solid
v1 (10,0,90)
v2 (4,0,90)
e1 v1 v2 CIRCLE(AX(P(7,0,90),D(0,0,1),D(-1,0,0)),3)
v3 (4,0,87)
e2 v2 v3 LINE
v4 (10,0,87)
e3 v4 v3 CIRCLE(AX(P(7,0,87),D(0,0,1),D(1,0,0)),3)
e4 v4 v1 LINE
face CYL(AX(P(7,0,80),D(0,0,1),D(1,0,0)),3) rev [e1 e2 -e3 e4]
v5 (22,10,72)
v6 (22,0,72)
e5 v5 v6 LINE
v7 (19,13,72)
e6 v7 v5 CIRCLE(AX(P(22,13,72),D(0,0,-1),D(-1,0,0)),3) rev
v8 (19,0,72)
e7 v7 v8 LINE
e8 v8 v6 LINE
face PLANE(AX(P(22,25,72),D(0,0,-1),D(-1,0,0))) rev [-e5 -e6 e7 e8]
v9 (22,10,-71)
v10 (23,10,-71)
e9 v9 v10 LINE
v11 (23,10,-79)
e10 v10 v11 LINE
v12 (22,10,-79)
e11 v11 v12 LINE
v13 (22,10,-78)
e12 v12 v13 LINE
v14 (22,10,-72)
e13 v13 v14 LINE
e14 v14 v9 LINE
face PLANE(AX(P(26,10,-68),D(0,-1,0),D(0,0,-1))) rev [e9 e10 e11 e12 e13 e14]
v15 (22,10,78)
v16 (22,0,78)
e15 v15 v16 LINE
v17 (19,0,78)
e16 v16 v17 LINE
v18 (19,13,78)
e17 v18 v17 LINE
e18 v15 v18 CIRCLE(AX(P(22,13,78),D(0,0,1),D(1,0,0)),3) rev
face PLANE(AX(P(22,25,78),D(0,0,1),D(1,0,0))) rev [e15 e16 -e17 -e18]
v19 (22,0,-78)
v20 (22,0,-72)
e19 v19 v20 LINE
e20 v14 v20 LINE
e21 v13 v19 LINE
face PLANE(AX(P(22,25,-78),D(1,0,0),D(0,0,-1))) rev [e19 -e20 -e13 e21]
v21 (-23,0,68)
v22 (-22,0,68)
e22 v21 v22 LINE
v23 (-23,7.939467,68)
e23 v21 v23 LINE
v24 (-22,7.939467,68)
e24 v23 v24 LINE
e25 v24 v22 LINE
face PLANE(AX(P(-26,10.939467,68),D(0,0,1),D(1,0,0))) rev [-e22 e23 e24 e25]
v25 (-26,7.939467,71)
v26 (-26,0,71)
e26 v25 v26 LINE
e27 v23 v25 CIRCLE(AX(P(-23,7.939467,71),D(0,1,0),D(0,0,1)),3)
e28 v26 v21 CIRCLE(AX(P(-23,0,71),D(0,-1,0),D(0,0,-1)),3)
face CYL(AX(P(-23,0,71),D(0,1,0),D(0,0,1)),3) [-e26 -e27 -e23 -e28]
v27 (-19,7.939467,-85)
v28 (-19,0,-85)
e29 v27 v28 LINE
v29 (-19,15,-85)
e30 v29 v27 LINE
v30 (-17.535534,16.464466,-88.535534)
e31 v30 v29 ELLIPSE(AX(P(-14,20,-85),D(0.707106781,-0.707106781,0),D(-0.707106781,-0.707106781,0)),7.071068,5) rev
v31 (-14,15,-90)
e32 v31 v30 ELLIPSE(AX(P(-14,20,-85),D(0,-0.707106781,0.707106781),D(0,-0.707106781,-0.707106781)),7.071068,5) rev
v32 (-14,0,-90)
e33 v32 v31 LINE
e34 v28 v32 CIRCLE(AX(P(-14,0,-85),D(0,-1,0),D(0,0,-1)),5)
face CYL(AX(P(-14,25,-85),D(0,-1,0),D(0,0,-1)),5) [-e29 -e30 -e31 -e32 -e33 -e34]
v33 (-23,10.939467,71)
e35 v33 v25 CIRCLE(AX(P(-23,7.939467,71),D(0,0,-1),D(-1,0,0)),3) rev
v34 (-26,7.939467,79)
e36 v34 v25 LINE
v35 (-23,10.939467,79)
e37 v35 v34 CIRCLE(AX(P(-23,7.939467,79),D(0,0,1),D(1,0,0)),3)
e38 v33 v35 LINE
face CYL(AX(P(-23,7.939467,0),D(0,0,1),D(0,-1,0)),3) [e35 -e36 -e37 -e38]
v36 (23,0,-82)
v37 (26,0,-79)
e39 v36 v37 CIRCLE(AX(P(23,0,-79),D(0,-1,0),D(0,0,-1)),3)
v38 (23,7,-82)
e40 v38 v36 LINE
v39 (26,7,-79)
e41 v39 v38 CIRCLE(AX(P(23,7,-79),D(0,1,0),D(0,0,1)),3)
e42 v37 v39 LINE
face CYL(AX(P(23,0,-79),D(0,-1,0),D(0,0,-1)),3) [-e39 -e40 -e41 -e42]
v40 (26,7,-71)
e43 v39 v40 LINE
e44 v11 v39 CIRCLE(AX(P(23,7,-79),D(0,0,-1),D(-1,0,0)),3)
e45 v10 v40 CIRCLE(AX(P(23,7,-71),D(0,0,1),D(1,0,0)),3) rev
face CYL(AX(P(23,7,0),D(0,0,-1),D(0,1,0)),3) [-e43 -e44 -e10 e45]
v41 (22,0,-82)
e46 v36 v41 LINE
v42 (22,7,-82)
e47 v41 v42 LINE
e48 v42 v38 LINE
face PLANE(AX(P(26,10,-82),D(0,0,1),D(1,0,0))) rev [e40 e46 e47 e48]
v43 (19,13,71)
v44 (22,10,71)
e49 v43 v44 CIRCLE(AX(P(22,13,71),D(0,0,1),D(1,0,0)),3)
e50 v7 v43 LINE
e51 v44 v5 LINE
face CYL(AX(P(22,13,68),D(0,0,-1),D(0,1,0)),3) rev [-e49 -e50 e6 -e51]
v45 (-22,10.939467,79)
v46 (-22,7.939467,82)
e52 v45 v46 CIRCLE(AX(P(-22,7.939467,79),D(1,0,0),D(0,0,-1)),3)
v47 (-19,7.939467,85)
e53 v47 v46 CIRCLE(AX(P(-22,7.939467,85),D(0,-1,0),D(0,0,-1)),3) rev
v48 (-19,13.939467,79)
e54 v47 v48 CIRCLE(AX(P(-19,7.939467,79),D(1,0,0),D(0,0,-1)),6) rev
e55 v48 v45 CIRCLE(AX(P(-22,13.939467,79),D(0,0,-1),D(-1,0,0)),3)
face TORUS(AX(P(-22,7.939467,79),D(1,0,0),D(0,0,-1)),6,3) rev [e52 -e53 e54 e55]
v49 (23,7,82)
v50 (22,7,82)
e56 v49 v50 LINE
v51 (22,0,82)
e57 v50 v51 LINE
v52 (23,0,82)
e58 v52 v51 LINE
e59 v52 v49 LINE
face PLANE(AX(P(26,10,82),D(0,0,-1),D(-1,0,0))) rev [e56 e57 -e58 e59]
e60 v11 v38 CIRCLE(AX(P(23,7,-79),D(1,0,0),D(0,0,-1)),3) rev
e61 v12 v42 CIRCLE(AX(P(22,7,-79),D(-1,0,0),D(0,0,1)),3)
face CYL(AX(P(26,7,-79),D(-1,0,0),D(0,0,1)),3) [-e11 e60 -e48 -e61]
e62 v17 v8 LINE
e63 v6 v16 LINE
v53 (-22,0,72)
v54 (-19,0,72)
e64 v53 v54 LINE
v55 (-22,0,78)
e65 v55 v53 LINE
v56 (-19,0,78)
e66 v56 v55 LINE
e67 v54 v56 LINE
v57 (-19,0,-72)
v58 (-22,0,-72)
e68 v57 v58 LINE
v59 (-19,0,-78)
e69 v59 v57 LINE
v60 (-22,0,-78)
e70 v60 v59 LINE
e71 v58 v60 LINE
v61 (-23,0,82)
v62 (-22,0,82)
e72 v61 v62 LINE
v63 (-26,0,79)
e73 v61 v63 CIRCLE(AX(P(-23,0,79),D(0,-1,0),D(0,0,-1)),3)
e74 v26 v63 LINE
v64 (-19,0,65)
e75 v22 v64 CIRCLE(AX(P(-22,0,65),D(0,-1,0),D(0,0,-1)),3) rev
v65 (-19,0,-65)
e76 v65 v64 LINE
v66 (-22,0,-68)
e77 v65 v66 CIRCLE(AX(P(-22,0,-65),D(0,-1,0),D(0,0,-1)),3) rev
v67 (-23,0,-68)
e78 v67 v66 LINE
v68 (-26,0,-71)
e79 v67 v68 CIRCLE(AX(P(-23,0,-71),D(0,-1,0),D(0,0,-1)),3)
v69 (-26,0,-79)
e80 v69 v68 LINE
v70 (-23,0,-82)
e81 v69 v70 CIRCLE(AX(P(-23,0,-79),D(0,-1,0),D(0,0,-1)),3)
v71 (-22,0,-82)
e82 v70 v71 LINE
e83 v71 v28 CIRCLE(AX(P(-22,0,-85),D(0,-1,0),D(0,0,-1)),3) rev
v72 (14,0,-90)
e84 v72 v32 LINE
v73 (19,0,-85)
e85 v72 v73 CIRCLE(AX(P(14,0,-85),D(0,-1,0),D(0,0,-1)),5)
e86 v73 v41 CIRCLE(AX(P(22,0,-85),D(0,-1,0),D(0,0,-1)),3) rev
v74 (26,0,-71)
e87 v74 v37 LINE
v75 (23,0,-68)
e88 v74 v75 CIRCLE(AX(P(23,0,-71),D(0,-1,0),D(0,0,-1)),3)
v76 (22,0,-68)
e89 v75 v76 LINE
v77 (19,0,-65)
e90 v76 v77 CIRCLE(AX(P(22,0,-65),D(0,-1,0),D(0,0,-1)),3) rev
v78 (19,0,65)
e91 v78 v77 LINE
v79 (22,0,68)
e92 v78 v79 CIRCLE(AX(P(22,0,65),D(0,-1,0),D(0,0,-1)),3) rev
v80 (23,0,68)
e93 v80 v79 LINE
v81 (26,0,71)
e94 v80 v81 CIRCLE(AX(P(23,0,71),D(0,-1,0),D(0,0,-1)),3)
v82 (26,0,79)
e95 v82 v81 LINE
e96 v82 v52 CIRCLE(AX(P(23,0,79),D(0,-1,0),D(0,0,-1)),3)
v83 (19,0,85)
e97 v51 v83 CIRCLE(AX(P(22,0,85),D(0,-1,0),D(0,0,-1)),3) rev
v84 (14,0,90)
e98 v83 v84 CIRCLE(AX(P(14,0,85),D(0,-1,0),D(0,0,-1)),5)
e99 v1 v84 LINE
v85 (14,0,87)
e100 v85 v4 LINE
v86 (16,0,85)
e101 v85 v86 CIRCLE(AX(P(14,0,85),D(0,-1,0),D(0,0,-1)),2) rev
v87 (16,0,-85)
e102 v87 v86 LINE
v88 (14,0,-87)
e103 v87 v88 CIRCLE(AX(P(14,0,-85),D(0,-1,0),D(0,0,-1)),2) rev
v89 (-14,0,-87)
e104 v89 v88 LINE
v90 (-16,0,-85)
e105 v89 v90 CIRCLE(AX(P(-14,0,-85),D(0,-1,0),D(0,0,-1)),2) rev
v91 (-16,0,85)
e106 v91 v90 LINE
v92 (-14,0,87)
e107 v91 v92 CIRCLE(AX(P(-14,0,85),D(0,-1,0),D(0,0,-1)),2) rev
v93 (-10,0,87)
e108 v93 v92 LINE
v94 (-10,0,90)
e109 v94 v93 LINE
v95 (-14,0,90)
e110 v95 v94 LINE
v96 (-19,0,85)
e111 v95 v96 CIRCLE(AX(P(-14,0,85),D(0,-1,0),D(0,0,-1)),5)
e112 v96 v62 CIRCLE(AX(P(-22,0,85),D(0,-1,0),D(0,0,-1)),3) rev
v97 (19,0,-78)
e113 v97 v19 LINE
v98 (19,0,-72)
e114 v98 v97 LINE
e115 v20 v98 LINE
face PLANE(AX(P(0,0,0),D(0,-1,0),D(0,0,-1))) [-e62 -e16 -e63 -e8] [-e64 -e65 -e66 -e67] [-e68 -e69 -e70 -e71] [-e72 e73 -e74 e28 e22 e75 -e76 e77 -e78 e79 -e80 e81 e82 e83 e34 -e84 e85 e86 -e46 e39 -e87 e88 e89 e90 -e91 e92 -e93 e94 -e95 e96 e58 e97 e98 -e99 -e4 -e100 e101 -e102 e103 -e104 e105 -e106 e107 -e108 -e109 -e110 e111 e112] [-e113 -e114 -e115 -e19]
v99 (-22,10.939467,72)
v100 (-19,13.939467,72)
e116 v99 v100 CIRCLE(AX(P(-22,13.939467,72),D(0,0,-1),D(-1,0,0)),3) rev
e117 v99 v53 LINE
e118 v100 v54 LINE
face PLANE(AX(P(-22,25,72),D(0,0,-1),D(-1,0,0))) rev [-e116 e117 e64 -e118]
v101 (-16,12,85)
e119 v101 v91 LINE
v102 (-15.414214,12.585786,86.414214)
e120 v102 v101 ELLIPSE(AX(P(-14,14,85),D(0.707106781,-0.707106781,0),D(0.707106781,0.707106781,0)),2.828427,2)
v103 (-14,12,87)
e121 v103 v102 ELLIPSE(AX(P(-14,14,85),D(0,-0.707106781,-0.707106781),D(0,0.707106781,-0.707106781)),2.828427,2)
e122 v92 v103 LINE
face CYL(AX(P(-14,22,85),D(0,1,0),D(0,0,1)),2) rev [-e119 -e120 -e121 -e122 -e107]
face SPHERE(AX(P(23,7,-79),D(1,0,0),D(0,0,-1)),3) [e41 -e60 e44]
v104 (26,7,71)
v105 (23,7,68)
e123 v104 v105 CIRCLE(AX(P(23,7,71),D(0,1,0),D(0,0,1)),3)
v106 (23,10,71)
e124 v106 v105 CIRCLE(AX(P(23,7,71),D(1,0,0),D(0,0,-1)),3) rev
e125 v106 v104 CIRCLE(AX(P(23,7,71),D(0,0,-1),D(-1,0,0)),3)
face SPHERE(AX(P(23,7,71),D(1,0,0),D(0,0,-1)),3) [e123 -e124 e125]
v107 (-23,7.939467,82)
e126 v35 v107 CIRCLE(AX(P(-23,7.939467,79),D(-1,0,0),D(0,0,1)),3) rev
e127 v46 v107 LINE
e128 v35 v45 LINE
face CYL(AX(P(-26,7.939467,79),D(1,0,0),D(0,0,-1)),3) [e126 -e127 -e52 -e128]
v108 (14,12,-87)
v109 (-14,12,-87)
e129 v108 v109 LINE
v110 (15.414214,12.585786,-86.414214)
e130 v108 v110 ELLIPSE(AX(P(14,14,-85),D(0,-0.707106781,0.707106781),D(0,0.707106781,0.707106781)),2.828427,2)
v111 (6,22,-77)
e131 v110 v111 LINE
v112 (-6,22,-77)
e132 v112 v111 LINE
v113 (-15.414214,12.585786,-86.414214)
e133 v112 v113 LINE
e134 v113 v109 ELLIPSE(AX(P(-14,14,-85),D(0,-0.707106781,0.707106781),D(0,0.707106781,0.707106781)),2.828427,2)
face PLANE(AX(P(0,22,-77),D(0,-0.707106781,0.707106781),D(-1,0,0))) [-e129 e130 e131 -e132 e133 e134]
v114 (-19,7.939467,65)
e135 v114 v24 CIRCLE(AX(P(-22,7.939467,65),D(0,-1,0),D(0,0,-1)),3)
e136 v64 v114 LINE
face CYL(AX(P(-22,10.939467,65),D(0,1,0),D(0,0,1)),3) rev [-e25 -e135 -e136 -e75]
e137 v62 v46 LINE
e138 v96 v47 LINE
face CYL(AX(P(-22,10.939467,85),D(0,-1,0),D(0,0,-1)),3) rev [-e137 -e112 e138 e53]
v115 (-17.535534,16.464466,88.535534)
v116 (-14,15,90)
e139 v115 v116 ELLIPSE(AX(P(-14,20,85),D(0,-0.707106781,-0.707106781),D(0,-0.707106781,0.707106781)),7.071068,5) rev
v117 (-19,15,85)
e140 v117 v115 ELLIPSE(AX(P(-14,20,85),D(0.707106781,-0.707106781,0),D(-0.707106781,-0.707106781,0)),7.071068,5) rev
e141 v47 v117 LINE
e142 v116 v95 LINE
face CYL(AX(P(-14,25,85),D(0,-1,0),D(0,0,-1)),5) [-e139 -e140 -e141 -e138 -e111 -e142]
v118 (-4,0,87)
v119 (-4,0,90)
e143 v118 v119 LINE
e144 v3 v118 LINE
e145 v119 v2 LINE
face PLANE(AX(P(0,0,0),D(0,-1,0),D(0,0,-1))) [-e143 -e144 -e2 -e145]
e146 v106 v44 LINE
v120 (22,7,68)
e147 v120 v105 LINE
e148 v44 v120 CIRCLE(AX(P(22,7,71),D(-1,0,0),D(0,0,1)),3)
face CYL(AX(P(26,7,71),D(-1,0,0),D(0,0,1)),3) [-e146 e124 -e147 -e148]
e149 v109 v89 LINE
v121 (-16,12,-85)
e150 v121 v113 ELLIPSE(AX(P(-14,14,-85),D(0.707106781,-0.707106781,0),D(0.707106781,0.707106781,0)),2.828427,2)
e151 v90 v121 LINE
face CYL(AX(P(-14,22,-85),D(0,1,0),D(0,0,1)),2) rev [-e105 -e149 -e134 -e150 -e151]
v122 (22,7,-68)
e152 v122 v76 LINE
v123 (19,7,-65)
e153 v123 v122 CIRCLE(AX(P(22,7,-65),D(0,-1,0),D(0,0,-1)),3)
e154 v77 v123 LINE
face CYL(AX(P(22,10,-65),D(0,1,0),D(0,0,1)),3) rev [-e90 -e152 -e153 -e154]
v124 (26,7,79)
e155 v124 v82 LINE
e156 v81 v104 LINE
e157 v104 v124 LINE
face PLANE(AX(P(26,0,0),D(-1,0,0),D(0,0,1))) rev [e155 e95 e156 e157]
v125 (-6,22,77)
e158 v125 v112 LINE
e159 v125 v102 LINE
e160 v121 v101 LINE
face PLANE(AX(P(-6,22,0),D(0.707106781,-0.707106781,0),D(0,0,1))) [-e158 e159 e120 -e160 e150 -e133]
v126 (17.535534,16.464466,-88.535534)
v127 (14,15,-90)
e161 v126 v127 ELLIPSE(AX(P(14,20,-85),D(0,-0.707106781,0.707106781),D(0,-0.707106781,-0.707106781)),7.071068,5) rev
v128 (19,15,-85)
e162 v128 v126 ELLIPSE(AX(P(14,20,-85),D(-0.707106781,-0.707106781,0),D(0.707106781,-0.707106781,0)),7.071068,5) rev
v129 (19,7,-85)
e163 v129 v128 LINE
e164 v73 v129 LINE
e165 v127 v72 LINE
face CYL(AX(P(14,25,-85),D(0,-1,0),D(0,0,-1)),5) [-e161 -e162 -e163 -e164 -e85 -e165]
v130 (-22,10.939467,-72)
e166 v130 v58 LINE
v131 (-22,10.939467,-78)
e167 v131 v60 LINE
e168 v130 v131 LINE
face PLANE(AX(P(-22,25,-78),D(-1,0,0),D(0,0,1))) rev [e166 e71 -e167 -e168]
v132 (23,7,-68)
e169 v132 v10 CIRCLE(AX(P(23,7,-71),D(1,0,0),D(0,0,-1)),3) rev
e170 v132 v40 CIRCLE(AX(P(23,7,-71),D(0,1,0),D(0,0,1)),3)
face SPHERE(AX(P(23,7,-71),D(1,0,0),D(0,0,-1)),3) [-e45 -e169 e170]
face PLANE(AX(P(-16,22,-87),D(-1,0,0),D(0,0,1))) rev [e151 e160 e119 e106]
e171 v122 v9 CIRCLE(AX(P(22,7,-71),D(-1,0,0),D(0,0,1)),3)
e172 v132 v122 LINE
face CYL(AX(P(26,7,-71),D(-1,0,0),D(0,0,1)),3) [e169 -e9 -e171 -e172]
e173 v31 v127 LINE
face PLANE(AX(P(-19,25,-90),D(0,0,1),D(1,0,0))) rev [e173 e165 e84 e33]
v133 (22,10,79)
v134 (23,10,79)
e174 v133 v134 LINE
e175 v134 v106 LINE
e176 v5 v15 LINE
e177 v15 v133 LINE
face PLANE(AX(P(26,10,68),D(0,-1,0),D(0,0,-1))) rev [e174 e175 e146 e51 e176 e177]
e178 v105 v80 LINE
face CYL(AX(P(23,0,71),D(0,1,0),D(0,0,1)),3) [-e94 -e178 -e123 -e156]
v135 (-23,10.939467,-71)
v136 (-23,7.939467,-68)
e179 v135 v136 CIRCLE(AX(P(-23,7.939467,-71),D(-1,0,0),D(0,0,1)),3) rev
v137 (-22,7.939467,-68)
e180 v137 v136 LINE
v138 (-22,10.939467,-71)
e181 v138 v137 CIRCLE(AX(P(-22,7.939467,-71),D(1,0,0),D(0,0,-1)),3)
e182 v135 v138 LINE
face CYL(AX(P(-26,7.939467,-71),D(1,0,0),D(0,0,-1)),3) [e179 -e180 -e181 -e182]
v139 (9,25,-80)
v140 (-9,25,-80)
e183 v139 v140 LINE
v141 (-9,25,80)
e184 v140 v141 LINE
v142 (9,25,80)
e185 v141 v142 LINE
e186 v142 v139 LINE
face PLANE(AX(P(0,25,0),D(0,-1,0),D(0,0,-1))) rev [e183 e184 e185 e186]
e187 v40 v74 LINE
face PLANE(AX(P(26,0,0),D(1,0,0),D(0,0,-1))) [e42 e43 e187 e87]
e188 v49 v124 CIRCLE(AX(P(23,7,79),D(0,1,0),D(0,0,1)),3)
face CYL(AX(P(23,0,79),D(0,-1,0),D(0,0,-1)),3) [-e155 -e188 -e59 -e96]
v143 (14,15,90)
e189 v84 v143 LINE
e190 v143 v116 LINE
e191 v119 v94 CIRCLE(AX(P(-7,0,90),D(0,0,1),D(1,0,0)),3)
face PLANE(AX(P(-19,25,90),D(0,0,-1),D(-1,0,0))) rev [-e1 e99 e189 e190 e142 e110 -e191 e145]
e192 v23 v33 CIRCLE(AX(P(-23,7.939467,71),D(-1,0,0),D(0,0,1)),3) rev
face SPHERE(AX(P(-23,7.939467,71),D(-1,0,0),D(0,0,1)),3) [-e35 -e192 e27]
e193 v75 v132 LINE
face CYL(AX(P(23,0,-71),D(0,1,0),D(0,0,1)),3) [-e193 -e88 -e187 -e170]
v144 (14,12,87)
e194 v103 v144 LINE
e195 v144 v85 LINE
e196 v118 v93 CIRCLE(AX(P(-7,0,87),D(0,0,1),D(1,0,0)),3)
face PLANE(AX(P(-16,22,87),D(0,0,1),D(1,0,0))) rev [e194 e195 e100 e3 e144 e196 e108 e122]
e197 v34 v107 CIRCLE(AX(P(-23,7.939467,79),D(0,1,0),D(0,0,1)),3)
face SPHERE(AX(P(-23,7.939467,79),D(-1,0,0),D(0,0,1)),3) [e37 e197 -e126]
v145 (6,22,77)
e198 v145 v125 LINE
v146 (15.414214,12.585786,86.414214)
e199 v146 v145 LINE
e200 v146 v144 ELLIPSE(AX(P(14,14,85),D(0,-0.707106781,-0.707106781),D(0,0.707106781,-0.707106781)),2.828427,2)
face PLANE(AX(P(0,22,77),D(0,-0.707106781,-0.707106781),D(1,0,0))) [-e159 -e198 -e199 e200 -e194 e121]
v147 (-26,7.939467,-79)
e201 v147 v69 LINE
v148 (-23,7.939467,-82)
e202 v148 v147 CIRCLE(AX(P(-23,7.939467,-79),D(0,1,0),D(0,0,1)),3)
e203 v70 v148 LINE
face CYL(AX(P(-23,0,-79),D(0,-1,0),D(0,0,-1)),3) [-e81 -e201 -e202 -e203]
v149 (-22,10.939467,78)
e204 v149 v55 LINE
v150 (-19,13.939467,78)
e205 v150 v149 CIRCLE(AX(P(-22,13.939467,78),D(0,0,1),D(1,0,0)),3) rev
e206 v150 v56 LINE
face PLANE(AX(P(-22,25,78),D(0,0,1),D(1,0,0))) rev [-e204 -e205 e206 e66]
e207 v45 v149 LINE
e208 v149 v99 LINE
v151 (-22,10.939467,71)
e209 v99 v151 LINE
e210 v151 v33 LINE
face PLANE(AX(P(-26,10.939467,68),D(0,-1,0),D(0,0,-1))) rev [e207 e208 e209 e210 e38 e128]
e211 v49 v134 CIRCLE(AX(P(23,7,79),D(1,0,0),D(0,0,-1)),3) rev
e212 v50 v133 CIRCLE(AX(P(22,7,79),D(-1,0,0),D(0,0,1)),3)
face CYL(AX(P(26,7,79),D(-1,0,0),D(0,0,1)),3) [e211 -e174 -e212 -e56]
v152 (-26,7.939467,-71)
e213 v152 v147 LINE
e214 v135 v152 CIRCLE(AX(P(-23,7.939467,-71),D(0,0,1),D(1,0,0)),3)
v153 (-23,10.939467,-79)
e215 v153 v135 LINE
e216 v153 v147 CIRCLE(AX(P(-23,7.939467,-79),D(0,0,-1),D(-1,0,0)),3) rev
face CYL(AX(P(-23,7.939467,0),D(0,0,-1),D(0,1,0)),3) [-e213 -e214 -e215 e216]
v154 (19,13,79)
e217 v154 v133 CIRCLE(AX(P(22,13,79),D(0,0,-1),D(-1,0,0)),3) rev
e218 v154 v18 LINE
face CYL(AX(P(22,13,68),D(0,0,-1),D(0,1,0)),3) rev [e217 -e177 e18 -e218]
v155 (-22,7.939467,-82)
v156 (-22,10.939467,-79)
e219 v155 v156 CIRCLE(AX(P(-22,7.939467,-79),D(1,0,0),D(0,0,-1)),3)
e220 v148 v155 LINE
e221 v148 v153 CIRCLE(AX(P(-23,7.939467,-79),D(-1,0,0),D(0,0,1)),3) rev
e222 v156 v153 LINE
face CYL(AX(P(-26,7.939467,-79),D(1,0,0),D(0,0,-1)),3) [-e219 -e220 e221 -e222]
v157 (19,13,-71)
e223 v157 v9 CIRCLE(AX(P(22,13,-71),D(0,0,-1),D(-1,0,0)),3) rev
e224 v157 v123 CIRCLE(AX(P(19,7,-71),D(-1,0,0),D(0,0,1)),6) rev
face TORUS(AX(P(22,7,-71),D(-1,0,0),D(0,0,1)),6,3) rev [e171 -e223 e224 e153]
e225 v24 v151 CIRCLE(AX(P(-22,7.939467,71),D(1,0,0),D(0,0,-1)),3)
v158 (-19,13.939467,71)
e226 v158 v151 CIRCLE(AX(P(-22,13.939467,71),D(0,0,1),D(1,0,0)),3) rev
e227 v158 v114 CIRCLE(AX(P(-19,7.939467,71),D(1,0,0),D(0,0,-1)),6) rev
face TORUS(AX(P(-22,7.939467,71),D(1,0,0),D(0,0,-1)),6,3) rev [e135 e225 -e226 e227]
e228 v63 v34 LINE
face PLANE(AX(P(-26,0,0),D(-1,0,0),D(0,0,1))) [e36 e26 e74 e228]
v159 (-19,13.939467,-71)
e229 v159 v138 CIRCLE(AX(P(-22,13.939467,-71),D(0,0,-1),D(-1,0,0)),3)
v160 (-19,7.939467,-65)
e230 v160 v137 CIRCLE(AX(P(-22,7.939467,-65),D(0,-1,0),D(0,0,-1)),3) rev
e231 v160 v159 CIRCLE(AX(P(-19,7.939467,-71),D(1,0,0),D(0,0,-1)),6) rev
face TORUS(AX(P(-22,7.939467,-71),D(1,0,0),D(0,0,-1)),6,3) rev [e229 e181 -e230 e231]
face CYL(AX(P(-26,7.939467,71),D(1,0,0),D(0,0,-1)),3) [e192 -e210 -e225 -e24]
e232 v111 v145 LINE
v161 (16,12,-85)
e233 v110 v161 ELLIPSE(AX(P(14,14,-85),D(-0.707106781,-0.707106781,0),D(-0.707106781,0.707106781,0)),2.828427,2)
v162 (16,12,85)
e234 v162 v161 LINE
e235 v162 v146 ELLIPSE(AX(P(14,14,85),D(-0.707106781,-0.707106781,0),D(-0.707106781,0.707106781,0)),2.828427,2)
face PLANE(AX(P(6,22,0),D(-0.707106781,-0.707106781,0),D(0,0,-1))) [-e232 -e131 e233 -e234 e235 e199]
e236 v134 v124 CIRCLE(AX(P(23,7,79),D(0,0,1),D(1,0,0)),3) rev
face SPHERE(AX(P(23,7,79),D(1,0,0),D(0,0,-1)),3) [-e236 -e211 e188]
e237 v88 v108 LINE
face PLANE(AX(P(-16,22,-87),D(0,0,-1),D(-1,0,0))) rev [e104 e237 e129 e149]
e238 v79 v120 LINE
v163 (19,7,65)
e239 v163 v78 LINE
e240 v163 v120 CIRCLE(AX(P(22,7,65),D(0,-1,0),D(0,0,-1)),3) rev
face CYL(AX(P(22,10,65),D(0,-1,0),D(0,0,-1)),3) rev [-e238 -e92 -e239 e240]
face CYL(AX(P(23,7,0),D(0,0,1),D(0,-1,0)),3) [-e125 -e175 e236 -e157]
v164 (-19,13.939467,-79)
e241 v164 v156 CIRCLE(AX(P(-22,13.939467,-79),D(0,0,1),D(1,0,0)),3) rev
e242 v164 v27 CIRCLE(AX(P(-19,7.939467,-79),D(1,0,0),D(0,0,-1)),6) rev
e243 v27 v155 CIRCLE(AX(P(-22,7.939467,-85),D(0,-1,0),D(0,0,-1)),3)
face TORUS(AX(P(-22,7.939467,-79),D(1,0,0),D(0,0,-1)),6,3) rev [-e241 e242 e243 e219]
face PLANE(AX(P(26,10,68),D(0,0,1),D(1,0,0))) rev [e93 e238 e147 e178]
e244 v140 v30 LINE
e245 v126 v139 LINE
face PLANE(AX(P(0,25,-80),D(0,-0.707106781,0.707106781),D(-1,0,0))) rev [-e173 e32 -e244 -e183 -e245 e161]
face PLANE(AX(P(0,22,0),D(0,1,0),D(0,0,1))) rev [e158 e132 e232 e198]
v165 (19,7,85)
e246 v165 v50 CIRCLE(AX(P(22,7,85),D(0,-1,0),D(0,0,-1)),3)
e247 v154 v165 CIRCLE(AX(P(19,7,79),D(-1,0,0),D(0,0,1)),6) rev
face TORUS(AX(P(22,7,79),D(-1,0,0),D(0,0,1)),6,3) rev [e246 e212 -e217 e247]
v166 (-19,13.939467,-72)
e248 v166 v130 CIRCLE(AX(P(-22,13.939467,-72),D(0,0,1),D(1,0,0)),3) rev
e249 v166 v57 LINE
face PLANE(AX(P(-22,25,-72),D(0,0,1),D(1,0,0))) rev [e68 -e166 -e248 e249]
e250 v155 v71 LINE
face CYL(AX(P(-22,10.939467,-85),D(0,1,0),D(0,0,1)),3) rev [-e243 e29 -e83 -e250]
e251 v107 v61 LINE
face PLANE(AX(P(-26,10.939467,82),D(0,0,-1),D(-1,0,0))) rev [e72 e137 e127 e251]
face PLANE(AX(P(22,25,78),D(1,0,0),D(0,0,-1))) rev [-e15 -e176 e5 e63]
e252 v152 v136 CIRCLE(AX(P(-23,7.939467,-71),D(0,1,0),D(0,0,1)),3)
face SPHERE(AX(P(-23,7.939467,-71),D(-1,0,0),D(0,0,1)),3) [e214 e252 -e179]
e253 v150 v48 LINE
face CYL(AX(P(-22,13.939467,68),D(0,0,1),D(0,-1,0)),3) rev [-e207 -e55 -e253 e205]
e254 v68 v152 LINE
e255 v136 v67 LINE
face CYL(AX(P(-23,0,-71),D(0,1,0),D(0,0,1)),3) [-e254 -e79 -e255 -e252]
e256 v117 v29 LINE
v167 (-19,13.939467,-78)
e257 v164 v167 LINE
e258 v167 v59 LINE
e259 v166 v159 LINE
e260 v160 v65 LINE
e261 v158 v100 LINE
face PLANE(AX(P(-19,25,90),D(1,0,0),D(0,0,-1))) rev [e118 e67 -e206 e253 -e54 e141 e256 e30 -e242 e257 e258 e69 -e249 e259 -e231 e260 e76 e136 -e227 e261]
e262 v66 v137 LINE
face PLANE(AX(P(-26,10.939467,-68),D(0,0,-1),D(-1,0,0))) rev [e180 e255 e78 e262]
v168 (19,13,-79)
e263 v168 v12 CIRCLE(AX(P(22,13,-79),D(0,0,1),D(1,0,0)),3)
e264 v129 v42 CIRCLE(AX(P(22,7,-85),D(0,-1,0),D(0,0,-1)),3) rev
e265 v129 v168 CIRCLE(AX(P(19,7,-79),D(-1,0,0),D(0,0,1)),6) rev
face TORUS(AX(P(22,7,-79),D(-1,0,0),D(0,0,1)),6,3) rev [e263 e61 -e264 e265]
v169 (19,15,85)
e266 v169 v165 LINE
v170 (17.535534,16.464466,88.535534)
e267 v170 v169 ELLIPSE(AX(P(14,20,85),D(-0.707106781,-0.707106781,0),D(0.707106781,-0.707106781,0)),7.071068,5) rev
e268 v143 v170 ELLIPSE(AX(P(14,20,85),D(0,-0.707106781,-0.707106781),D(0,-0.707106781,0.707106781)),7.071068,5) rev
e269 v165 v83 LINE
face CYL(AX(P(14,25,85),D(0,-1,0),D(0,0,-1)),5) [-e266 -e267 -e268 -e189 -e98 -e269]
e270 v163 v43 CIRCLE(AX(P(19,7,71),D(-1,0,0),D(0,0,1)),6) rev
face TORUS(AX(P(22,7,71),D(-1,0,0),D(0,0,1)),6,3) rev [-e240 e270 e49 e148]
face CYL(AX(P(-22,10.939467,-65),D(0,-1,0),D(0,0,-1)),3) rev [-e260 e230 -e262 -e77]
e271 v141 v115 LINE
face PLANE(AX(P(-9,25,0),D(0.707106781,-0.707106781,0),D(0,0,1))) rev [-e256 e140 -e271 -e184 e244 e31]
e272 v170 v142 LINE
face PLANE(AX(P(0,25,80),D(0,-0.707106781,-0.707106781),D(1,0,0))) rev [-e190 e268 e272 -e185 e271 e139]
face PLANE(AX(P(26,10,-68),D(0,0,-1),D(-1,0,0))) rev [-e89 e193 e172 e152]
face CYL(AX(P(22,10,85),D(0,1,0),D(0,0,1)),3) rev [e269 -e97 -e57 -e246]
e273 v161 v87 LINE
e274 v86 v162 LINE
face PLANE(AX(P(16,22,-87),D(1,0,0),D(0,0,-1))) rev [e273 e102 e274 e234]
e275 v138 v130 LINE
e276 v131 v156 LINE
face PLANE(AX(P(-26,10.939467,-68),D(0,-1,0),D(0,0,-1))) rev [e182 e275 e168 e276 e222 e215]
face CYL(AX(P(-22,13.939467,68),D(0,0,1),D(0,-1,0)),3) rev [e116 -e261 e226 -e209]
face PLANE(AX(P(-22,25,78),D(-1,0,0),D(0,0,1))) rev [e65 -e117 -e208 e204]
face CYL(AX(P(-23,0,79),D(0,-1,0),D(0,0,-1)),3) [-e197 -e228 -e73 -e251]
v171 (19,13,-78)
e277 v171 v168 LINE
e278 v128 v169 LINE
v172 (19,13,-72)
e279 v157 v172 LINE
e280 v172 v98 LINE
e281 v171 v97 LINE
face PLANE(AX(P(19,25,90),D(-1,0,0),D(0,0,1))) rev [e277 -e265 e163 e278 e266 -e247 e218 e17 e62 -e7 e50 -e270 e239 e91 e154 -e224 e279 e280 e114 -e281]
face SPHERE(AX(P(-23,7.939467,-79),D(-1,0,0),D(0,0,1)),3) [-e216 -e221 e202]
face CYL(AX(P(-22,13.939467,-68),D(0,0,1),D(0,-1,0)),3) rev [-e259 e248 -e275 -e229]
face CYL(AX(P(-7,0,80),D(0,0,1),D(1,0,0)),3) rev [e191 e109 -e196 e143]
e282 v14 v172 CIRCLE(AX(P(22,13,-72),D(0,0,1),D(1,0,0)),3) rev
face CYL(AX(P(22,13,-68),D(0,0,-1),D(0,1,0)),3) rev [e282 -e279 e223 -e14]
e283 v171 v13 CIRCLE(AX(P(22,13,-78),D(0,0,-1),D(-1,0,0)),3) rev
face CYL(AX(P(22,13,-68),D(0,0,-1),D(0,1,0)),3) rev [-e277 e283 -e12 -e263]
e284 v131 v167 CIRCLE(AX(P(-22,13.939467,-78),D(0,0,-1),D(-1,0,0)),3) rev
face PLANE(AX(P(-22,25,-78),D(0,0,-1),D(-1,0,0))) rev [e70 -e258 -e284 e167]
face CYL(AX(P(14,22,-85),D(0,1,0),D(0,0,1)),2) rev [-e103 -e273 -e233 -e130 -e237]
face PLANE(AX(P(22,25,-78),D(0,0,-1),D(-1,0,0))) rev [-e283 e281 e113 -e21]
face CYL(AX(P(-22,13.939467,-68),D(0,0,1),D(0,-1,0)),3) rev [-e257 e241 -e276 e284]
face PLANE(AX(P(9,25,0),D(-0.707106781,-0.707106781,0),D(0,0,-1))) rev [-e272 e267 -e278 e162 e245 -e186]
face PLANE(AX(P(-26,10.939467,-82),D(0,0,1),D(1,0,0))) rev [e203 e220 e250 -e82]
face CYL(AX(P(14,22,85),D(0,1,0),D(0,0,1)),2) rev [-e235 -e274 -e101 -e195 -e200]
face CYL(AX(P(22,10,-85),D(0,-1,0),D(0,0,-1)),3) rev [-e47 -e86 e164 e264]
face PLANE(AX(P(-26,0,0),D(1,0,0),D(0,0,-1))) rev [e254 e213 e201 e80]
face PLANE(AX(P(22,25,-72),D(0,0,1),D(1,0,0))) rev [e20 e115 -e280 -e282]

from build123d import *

# Parameters (mm, degrees)
SKETCH1_W           = 38
SKETCH1_H           = 180
BOSS_EXTRUDE1_DEPTH = 25
SKETCH2_W           = 32
SKETCH2_H           = 174
CUT_EXTRUDE1_DEPTH  = 22
CHAMFER1_SIZE       = 10
FILLET1_R           = 5
FILLET2_R           = 2
SKETCH3_W           = 14
SKETCH3_H           = 10
BOSS_EXTRUDE2_DEPTH = 7
SKETCH4_W           = 14
SKETCH4_H           = 10.939467079
BOSS_EXTRUDE3_DEPTH = 7
FILLET3_R           = 3
SKETCH5_W           = 3
SKETCH5_H           = 6
CUT_EXTRUDE2_DEPTH  = 97.958754117
SKETCH6_R           = 3
CUT_EXTRUDE3_DEPTH  = 10


with BuildPart() as part:
    # Sketch1 → Boss-Extrude1 (new body)
    with BuildSketch(Plane(origin=(0, 0, 0), x_dir=(1, 0, 0), z_dir=(0, 1, 0))):
        Rectangle(SKETCH1_W, SKETCH1_H)
    extrude(amount=BOSS_EXTRUDE1_DEPTH)

    # Sketch2 → Cut-Extrude1 (cut)
    with BuildSketch(Plane.XZ):
        Rectangle(SKETCH2_W, SKETCH2_H)
    extrude(amount=-CUT_EXTRUDE1_DEPTH, mode=Mode.SUBTRACT)

    # Chamfer1
    chamfer1_edges = [part.edges().sort_by_distance(p)[0] for p in [
        (-19, 25, 0),
        (16, 22, 0),
        (0, 25, 90),
        (0, 22, -87),
        (-16, 22, 0),
        (0, 22, 87),
        (19, 25, 0),
        (0, 25, -90),
    ]]
    chamfer(chamfer1_edges, length=CHAMFER1_SIZE)

    # Fillet1
    fillet1_edges = [part.edges().sort_by_distance(p)[0] for p in [
        (19, 7.5, 90),
        (-19, 7.5, 90),
        (-19, 7.5, -90),
        (19, 7.5, -90),
    ]]
    fillet(fillet1_edges, radius=FILLET1_R)

    # Fillet2
    fillet2_edges = [part.edges().sort_by_distance(p)[0] for p in [
        (16, 6, -87),
        (-16, 6, -87),
        (-16, 6, 87),
        (16, 6, 87),
    ]]
    fillet(fillet2_edges, radius=FILLET2_R)

    # Sketch3 → Boss-Extrude2 (add)
    with BuildSketch(Plane(origin=(19, 0, 0), x_dir=(0, 0, -1), z_dir=(1, 0, 0))):
        with Locations((-75, 5)):
            Rectangle(SKETCH3_W, SKETCH3_H)
        with Locations((75, 5)):
            Rectangle(SKETCH3_W, SKETCH3_H)
    extrude(amount=BOSS_EXTRUDE2_DEPTH)

    # Sketch4 → Boss-Extrude3 (add)
    with BuildSketch(Plane.ZY.offset(19)):
        with Locations((-75, 5.469733539)):
            Rectangle(SKETCH4_W, SKETCH4_H)
        with Locations((75, 5.469733539)):
            Rectangle(SKETCH4_W, SKETCH4_H)
    extrude(amount=BOSS_EXTRUDE3_DEPTH)

    # Fillet3
    fillet3_edges = [part.edges().sort_by_distance(p)[0] for p in [
        (19, 5, 82),
        (22.5, 10, 82),
        (19, 5, 68),
        (19, 10, 75),
        (22.5, 10, 68),
        (26, 5, 82),
        (26, 5, 68),
        (26, 10, 75),
        (19, 5, -68),
        (22.5, 10, -68),
        (19, 5, -82),
        (19, 10, -75),
        (22.5, 10, -82),
        (26, 5, -68),
        (26, 5, -82),
        (26, 10, -75),
        (-19, 5.46973354, -82),
        (-22.5, 10.939467079, -82),
        (-19, 5.46973354, -68),
        (-19, 10.939467079, -75),
        (-22.5, 10.939467079, -68),
        (-26, 5.46973354, -82),
        (-26, 5.46973354, -68),
        (-26, 10.939467079, -75),
        (-19, 5.46973354, 68),
        (-22.5, 10.939467079, 68),
        (-19, 5.46973354, 82),
        (-19, 10.939467079, 75),
        (-22.5, 10.939467079, 82),
        (-26, 5.46973354, 68),
        (-26, 5.46973354, 82),
        (-26, 10.939467079, 75),
    ]]
    fillet(fillet3_edges, radius=FILLET3_R - 0.0001)  # a hair under: the kernel refuses the full size

    # Sketch5 → Cut-Extrude2 (cut, through all)
    with BuildSketch(Plane.XZ):
        with Locations((20.5, 75)):
            Rectangle(SKETCH5_W, SKETCH5_H)
        with Locations((-20.5, -75)):
            Rectangle(SKETCH5_W, SKETCH5_H)
        with Locations((20.5, -75)):
            Rectangle(SKETCH5_W, SKETCH5_H)
        with Locations((-20.5, 75)):
            Rectangle(SKETCH5_W, SKETCH5_H)
    extrude(amount=-CUT_EXTRUDE2_DEPTH, mode=Mode.SUBTRACT)

    # Sketch6 → Cut-Extrude3 (cut)
    with BuildSketch(Plane.XY.offset(90)):
        with Locations((-7, 0)):
            Circle(SKETCH6_R)
        with Locations((7, 0)):
            Circle(SKETCH6_R)
    extrude(amount=-CUT_EXTRUDE3_DEPTH, mode=Mode.SUBTRACT)


solid = part.part
